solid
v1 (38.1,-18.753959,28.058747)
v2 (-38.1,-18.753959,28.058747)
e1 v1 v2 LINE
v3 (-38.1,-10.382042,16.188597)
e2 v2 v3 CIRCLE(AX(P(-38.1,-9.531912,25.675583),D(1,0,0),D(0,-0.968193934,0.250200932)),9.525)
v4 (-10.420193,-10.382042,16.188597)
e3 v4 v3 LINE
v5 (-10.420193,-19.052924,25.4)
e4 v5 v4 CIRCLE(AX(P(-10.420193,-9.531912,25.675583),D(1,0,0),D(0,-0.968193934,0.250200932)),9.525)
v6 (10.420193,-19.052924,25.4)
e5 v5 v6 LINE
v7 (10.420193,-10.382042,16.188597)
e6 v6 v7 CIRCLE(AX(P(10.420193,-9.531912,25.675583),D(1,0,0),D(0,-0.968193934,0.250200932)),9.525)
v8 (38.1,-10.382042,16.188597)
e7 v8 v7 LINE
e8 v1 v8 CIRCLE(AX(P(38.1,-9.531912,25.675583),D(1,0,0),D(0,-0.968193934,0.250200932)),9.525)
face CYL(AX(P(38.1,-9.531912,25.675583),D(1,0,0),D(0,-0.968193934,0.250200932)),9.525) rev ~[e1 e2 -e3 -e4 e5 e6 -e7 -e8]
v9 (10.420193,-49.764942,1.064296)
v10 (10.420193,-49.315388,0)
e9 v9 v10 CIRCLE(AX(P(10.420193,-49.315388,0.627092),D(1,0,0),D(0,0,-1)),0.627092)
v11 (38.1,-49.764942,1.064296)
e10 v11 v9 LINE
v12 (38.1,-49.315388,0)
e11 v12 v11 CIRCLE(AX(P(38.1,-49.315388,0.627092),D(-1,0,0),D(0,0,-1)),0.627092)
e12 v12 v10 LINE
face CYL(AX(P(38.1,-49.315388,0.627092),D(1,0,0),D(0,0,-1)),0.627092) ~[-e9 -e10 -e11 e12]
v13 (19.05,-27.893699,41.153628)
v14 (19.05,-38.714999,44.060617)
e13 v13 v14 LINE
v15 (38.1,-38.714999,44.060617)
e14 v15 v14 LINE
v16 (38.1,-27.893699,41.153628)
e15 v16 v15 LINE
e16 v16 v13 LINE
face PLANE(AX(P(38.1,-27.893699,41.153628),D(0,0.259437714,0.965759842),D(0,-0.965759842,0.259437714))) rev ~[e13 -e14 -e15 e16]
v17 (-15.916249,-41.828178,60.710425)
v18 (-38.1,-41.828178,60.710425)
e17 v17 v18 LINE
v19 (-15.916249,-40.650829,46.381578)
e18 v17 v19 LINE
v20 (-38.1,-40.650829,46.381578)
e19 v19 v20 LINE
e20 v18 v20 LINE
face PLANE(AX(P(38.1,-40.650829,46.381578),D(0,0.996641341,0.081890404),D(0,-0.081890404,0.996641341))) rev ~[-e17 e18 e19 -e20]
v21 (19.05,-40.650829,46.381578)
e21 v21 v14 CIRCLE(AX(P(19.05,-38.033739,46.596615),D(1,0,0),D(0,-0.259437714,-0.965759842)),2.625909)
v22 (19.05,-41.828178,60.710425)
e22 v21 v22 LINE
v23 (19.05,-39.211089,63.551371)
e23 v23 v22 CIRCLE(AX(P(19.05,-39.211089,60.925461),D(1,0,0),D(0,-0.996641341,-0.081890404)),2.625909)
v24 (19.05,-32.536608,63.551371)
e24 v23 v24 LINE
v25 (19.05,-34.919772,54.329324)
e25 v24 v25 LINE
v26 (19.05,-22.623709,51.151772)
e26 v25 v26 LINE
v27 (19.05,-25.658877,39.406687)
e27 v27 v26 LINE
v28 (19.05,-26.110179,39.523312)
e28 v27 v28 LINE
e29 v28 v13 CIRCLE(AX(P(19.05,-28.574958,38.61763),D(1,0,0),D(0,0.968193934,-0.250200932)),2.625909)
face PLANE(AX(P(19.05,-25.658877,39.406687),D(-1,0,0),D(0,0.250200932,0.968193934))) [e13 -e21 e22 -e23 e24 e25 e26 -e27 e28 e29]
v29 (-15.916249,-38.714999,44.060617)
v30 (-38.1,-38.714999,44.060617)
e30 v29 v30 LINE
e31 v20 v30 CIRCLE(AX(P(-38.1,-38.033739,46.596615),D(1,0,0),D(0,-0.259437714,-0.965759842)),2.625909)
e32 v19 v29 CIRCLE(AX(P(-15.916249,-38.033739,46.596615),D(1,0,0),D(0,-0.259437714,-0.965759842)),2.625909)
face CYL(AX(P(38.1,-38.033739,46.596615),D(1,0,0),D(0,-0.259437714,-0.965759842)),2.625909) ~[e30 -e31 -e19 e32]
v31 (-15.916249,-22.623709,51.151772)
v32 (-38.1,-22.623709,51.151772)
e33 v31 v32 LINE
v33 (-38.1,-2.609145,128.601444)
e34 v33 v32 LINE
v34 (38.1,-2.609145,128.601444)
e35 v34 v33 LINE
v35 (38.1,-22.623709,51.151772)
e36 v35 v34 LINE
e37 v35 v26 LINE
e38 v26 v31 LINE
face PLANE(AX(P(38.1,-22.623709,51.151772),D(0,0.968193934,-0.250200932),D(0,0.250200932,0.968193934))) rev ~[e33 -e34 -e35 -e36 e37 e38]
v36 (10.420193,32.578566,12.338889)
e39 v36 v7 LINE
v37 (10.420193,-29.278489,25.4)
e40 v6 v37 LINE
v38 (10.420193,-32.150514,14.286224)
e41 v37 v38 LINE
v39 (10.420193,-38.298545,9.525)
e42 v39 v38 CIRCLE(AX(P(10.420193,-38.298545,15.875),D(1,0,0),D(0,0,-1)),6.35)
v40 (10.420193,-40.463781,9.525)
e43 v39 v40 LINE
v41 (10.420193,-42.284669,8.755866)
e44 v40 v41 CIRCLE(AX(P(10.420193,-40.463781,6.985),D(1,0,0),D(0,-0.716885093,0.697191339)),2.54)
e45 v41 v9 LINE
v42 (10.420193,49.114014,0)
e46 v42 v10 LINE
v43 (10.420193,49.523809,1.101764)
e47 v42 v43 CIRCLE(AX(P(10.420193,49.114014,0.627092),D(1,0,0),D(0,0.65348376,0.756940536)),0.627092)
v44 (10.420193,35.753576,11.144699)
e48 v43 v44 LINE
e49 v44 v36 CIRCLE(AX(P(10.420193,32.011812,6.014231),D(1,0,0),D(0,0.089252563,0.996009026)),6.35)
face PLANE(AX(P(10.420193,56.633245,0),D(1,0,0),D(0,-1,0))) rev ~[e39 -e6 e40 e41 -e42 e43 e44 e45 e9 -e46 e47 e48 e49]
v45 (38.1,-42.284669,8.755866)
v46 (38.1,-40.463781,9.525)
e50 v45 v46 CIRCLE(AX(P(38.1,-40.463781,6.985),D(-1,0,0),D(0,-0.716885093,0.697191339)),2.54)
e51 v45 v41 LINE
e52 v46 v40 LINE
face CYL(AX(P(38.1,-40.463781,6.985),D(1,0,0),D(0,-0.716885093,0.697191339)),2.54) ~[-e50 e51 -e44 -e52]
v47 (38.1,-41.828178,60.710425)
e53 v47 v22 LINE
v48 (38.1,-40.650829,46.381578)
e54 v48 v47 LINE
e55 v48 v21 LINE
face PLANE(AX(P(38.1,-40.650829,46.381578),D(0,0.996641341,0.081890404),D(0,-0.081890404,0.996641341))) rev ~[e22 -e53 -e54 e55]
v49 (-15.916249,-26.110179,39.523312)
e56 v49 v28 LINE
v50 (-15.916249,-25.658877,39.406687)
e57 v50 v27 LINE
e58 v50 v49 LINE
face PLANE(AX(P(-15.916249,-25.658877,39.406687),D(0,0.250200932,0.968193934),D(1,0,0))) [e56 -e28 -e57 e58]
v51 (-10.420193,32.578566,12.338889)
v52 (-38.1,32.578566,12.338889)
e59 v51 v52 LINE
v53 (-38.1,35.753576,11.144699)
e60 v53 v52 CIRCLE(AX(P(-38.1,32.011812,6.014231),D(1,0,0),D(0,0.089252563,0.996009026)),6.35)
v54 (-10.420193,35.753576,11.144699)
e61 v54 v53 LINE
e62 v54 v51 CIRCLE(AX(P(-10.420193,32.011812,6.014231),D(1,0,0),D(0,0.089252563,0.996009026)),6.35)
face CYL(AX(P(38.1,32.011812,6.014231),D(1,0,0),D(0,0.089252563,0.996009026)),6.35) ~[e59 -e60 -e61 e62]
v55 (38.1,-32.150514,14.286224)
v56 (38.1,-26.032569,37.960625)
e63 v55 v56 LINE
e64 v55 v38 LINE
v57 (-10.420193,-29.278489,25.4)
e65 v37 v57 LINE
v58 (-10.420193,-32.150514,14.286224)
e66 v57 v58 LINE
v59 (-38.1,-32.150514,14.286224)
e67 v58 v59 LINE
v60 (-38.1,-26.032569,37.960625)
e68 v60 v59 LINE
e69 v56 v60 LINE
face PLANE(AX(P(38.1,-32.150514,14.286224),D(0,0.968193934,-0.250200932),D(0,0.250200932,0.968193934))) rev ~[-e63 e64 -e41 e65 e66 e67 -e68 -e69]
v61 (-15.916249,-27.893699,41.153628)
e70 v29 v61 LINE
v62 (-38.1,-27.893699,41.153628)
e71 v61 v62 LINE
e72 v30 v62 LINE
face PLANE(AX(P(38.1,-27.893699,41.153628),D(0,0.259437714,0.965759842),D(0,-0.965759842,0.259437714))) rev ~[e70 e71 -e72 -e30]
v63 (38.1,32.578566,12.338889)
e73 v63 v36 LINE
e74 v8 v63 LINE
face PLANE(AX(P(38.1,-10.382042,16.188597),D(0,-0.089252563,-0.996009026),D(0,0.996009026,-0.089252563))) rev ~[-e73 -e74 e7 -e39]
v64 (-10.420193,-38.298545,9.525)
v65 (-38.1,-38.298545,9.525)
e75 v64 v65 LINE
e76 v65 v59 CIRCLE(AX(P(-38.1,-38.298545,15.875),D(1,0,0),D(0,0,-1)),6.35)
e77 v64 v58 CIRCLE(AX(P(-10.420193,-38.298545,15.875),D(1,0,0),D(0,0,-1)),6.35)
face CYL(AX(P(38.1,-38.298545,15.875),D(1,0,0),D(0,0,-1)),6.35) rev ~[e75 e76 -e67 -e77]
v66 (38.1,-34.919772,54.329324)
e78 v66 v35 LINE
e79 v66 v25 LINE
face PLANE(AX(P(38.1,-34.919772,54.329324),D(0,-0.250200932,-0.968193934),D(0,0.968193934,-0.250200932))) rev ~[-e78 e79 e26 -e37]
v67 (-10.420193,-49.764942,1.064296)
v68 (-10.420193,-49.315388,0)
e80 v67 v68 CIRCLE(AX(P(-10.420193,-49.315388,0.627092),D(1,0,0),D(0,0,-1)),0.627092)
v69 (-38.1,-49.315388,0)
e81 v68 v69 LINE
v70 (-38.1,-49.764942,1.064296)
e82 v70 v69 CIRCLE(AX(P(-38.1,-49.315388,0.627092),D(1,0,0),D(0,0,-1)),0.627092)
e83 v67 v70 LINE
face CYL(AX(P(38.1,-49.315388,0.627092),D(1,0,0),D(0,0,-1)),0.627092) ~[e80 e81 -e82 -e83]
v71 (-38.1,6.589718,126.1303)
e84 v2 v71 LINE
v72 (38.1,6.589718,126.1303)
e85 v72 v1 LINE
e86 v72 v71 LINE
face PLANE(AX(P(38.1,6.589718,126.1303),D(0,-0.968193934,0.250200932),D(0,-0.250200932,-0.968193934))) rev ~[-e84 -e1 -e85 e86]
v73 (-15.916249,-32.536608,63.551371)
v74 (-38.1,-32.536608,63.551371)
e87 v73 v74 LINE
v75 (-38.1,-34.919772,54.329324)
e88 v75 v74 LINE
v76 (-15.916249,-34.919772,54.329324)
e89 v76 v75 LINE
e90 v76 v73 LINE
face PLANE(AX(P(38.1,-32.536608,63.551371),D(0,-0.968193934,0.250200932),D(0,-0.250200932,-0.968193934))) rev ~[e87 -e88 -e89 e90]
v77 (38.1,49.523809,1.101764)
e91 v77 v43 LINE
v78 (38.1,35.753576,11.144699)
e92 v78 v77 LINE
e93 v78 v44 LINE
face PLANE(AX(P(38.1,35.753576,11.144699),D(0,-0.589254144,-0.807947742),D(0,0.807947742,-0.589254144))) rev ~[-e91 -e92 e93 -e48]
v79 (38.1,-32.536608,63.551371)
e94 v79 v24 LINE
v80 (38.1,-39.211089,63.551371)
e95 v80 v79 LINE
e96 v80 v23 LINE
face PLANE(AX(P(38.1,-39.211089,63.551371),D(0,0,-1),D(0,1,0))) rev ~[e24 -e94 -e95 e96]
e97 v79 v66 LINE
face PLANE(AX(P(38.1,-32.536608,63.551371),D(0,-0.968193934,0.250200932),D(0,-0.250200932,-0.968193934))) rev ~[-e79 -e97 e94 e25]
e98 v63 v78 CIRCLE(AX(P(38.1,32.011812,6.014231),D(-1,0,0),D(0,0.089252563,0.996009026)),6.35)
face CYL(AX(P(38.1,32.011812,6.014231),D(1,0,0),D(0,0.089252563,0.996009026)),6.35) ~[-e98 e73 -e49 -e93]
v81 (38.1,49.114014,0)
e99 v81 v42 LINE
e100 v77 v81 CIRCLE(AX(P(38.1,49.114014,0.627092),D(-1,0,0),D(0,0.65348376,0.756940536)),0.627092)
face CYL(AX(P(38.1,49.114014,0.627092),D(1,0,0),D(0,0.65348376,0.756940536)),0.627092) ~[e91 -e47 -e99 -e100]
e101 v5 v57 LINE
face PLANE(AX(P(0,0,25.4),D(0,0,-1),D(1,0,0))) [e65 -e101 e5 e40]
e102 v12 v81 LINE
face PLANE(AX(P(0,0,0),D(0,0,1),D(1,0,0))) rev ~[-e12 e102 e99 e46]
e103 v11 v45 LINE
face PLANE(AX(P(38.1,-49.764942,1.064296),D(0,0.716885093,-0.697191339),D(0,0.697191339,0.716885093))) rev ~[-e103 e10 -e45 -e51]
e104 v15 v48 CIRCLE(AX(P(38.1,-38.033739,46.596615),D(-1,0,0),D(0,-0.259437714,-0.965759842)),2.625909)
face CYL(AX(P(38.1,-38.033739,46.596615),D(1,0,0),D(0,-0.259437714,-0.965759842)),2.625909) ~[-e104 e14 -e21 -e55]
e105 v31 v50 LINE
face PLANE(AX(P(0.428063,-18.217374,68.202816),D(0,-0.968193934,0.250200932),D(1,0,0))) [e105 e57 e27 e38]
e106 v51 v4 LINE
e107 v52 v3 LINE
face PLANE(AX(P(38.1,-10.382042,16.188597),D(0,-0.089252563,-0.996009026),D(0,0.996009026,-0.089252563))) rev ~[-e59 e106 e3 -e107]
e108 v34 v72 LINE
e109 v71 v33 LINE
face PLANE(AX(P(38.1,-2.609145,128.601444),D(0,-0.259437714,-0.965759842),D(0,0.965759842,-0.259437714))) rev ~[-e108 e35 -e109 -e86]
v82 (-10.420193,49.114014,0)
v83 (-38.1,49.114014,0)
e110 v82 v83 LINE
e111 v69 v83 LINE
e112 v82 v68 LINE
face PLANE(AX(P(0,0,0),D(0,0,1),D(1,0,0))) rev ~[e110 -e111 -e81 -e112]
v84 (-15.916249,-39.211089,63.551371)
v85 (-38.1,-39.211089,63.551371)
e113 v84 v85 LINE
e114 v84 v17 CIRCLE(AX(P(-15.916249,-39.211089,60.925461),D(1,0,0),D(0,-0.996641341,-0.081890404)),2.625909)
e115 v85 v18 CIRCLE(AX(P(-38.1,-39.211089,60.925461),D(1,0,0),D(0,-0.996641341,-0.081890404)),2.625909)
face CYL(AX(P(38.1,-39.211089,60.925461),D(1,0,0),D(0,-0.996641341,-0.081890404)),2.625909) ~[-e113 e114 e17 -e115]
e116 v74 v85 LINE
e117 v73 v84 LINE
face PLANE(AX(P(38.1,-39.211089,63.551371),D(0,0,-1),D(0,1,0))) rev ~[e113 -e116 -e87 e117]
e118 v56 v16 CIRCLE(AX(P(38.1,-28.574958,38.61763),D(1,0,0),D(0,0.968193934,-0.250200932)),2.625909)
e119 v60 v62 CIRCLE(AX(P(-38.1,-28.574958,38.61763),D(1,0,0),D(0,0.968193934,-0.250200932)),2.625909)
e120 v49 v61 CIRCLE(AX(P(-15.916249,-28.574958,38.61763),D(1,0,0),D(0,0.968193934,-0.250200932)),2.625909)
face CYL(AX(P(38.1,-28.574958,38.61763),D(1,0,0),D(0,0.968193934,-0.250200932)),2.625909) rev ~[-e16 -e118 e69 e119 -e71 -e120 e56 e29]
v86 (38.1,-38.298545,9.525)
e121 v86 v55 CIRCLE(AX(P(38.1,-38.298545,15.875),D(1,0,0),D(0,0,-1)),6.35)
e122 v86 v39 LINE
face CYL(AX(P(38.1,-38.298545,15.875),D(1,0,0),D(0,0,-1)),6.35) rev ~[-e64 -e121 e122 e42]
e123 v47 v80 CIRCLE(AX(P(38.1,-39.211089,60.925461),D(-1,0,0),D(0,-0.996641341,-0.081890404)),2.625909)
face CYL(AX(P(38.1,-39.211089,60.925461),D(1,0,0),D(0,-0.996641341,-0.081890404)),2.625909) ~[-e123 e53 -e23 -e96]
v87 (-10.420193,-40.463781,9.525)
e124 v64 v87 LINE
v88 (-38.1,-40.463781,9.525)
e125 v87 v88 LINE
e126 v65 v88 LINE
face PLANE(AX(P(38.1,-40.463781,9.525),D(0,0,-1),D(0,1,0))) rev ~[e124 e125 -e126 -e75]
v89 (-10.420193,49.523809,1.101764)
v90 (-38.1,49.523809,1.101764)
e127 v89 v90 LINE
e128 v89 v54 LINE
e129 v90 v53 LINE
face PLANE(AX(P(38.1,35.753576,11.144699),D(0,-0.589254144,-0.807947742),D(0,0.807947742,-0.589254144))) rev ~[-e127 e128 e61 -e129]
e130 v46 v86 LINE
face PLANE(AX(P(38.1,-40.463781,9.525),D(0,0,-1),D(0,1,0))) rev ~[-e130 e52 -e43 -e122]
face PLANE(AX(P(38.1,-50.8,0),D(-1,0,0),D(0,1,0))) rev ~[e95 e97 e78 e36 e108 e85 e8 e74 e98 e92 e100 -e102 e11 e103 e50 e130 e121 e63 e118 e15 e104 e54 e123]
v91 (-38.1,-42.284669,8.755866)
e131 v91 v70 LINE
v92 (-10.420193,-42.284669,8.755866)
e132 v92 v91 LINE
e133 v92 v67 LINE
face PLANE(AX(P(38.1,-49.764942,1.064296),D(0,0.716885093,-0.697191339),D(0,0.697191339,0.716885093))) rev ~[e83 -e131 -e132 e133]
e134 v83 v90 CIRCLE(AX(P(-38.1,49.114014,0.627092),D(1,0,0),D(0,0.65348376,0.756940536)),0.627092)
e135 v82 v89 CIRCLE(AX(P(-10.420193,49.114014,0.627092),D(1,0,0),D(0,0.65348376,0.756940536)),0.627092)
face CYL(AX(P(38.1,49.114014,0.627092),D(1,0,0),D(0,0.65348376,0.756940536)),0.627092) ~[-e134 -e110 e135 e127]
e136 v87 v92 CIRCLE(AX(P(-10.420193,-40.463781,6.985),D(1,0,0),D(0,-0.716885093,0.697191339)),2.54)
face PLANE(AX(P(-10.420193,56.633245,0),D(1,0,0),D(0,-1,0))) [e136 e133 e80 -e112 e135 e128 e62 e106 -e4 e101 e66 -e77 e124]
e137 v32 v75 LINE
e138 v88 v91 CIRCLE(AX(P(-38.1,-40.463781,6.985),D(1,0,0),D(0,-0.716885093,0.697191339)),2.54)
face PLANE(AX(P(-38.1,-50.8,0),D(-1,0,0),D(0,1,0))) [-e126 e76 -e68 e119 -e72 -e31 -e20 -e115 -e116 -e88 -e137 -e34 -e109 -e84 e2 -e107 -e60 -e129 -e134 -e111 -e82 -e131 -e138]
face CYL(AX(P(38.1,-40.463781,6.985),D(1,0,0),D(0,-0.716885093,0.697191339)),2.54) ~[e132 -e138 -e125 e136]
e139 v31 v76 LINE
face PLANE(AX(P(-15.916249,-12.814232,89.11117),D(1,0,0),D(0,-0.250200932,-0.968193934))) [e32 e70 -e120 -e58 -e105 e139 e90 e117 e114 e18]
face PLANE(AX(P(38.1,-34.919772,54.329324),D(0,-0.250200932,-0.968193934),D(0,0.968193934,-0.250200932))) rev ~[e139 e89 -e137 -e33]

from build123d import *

# Parameters (mm, degrees)
F0_W     = 76.2
F0_H     = 101.6
F1_DEPTH = 133.35
F3_DEPTH = 76.201
F4_W     = 34.9662494294
F4_H     = 12.1309220302
F5_DEPTH = 25.4
F6_W     = 20.8403859288
F6_H     = 113.2664903998
F7_DEPTH = 25.4


# Not quite as in the source:
# - a feature names something its author has since deleted; it is built from what else it names


with BuildPart() as f1:
    # F0 (on Top) → F1 (new body)
    with BuildSketch(Plane.XY):
        Rectangle(F0_W, F0_H)
    extrude(amount=F1_DEPTH)

    # F2 (on face) → F3 (cut, through all)
    with BuildSketch(Plane.YZ.offset(38.1)):
        with BuildLine():
            Line((49.114014449, 0), (50.8, 0))
            Line((50.8, 0), (50.8, 66.2650913))
            Line((50.8, 66.2650913), (50.8, 73.7310647964))
            Line((50.8, 73.7310647964), (50.8, 128.6014442141))
            Line((50.8, 128.6014442141), (50.8, 133.35))
            Line((50.8, 133.35), (-50.8, 133.35))
            Line((-50.8, 133.35), (-50.8, 0))
            Line((-50.8, 0), (-49.3153884285, 0))
            ThreePointArc((-49.3153884285, 0), (-49.8930613229, 0.38308634), (-49.7649416709, 1.0642959051))
            Line((-49.7649416709, 1.0642959051), (-42.2846688887, 8.7558660005))
            ThreePointArc((-42.2846688887, 8.7558660005), (-41.4521127702, 9.3248290153), (-40.4637807514, 9.525))
            Line((-40.4637807514, 9.525), (-38.2985454719, 9.525))
            ThreePointArc((-38.2985454719, 9.525), (-34.4105014329, 10.8544807489), (-32.1505139925, 14.2862240786))
            Line((-32.1505139925, 14.2862240786), (-26.0325690106, 37.9606251271))
            ThreePointArc((-26.0325690106, 37.9606251271), (-26.3063034957, 39.9399780989), (-27.8936985581, 41.1536278306))
            Line((-27.8936985581, 41.1536278306), (-38.7149990474, 44.0606170611))
            ThreePointArc((-38.7149990474, 44.0606170611), (-40.050293777, 44.9146793042), (-40.6508289049, 46.3815780362))
            Line((-40.6508289049, 46.3815780362), (-41.828178264, 60.7104246977))
            ThreePointArc((-41.828178264, 60.7104246977), (-41.1424179273, 62.7046091009), (-39.2110885015, 63.5513707689))
            Line((-39.2110885015, 63.5513707689), (-32.5366084985, 63.5513707689))
            Line((-32.5366084985, 63.5513707689), (-34.9197723805, 54.3293235498))
            Line((-34.9197723805, 54.3293235498), (-22.6237094217, 51.1517717071))
            Line((-22.6237094217, 51.1517717071), (-2.6091445634, 128.6014442141))
            Line((-2.6091445634, 128.6014442141), (6.5897179326, 126.1302999894))
            Line((6.5897179326, 126.1302999894), (-18.753958765, 28.0587468857))
            ThreePointArc((-18.753958765, 28.0587468857), (-17.3156963729, 20.1857452314), (-10.3820422123, 16.1885970308))
            Line((-10.3820422123, 16.1885970308), (32.5785662344, 12.338888515))
            ThreePointArc((32.5785662344, 12.338888515), (34.2472884437, 11.9577274025), (35.7535762689, 11.144699363))
            Line((35.7535762689, 11.144699363), (49.5238091926, 1.1017641769))
            ThreePointArc((49.5238091926, 1.1017641769), (49.7017678057, 0.4084810434), (49.114014449, 0))
        make_face()
    extrude(amount=-F3_DEPTH, mode=Mode.SUBTRACT)

    # F4 (on face) → F5 (cut)
    with BuildSketch(Plane(origin=(0, -33.598613666, 8.682562632), x_dir=(1, 0, 0), z_dir=(0, -0.9681939338, 0.2502009325))):
        Polygon((19.05, 73.9268932369), (-15.9162494294, 83.0707615279), (-15.9162494294, 43.8643618742), (19.05, 43.8643618742), align=None)
        with Locations((1.5668752853, 37.7989008591)):
            Rectangle(F4_W, F4_H)
    extrude(amount=F5_DEPTH, mode=Mode.SUBTRACT)

    # F6 (on face) → F7 (cut)
    with BuildSketch(Plane(origin=(0, 0, 0), x_dir=(1, 0, 0), z_dir=(0, 0, -1))):
        Rectangle(F6_W, F6_H)
    extrude(amount=-F7_DEPTH, mode=Mode.SUBTRACT)


solid = f1.part
